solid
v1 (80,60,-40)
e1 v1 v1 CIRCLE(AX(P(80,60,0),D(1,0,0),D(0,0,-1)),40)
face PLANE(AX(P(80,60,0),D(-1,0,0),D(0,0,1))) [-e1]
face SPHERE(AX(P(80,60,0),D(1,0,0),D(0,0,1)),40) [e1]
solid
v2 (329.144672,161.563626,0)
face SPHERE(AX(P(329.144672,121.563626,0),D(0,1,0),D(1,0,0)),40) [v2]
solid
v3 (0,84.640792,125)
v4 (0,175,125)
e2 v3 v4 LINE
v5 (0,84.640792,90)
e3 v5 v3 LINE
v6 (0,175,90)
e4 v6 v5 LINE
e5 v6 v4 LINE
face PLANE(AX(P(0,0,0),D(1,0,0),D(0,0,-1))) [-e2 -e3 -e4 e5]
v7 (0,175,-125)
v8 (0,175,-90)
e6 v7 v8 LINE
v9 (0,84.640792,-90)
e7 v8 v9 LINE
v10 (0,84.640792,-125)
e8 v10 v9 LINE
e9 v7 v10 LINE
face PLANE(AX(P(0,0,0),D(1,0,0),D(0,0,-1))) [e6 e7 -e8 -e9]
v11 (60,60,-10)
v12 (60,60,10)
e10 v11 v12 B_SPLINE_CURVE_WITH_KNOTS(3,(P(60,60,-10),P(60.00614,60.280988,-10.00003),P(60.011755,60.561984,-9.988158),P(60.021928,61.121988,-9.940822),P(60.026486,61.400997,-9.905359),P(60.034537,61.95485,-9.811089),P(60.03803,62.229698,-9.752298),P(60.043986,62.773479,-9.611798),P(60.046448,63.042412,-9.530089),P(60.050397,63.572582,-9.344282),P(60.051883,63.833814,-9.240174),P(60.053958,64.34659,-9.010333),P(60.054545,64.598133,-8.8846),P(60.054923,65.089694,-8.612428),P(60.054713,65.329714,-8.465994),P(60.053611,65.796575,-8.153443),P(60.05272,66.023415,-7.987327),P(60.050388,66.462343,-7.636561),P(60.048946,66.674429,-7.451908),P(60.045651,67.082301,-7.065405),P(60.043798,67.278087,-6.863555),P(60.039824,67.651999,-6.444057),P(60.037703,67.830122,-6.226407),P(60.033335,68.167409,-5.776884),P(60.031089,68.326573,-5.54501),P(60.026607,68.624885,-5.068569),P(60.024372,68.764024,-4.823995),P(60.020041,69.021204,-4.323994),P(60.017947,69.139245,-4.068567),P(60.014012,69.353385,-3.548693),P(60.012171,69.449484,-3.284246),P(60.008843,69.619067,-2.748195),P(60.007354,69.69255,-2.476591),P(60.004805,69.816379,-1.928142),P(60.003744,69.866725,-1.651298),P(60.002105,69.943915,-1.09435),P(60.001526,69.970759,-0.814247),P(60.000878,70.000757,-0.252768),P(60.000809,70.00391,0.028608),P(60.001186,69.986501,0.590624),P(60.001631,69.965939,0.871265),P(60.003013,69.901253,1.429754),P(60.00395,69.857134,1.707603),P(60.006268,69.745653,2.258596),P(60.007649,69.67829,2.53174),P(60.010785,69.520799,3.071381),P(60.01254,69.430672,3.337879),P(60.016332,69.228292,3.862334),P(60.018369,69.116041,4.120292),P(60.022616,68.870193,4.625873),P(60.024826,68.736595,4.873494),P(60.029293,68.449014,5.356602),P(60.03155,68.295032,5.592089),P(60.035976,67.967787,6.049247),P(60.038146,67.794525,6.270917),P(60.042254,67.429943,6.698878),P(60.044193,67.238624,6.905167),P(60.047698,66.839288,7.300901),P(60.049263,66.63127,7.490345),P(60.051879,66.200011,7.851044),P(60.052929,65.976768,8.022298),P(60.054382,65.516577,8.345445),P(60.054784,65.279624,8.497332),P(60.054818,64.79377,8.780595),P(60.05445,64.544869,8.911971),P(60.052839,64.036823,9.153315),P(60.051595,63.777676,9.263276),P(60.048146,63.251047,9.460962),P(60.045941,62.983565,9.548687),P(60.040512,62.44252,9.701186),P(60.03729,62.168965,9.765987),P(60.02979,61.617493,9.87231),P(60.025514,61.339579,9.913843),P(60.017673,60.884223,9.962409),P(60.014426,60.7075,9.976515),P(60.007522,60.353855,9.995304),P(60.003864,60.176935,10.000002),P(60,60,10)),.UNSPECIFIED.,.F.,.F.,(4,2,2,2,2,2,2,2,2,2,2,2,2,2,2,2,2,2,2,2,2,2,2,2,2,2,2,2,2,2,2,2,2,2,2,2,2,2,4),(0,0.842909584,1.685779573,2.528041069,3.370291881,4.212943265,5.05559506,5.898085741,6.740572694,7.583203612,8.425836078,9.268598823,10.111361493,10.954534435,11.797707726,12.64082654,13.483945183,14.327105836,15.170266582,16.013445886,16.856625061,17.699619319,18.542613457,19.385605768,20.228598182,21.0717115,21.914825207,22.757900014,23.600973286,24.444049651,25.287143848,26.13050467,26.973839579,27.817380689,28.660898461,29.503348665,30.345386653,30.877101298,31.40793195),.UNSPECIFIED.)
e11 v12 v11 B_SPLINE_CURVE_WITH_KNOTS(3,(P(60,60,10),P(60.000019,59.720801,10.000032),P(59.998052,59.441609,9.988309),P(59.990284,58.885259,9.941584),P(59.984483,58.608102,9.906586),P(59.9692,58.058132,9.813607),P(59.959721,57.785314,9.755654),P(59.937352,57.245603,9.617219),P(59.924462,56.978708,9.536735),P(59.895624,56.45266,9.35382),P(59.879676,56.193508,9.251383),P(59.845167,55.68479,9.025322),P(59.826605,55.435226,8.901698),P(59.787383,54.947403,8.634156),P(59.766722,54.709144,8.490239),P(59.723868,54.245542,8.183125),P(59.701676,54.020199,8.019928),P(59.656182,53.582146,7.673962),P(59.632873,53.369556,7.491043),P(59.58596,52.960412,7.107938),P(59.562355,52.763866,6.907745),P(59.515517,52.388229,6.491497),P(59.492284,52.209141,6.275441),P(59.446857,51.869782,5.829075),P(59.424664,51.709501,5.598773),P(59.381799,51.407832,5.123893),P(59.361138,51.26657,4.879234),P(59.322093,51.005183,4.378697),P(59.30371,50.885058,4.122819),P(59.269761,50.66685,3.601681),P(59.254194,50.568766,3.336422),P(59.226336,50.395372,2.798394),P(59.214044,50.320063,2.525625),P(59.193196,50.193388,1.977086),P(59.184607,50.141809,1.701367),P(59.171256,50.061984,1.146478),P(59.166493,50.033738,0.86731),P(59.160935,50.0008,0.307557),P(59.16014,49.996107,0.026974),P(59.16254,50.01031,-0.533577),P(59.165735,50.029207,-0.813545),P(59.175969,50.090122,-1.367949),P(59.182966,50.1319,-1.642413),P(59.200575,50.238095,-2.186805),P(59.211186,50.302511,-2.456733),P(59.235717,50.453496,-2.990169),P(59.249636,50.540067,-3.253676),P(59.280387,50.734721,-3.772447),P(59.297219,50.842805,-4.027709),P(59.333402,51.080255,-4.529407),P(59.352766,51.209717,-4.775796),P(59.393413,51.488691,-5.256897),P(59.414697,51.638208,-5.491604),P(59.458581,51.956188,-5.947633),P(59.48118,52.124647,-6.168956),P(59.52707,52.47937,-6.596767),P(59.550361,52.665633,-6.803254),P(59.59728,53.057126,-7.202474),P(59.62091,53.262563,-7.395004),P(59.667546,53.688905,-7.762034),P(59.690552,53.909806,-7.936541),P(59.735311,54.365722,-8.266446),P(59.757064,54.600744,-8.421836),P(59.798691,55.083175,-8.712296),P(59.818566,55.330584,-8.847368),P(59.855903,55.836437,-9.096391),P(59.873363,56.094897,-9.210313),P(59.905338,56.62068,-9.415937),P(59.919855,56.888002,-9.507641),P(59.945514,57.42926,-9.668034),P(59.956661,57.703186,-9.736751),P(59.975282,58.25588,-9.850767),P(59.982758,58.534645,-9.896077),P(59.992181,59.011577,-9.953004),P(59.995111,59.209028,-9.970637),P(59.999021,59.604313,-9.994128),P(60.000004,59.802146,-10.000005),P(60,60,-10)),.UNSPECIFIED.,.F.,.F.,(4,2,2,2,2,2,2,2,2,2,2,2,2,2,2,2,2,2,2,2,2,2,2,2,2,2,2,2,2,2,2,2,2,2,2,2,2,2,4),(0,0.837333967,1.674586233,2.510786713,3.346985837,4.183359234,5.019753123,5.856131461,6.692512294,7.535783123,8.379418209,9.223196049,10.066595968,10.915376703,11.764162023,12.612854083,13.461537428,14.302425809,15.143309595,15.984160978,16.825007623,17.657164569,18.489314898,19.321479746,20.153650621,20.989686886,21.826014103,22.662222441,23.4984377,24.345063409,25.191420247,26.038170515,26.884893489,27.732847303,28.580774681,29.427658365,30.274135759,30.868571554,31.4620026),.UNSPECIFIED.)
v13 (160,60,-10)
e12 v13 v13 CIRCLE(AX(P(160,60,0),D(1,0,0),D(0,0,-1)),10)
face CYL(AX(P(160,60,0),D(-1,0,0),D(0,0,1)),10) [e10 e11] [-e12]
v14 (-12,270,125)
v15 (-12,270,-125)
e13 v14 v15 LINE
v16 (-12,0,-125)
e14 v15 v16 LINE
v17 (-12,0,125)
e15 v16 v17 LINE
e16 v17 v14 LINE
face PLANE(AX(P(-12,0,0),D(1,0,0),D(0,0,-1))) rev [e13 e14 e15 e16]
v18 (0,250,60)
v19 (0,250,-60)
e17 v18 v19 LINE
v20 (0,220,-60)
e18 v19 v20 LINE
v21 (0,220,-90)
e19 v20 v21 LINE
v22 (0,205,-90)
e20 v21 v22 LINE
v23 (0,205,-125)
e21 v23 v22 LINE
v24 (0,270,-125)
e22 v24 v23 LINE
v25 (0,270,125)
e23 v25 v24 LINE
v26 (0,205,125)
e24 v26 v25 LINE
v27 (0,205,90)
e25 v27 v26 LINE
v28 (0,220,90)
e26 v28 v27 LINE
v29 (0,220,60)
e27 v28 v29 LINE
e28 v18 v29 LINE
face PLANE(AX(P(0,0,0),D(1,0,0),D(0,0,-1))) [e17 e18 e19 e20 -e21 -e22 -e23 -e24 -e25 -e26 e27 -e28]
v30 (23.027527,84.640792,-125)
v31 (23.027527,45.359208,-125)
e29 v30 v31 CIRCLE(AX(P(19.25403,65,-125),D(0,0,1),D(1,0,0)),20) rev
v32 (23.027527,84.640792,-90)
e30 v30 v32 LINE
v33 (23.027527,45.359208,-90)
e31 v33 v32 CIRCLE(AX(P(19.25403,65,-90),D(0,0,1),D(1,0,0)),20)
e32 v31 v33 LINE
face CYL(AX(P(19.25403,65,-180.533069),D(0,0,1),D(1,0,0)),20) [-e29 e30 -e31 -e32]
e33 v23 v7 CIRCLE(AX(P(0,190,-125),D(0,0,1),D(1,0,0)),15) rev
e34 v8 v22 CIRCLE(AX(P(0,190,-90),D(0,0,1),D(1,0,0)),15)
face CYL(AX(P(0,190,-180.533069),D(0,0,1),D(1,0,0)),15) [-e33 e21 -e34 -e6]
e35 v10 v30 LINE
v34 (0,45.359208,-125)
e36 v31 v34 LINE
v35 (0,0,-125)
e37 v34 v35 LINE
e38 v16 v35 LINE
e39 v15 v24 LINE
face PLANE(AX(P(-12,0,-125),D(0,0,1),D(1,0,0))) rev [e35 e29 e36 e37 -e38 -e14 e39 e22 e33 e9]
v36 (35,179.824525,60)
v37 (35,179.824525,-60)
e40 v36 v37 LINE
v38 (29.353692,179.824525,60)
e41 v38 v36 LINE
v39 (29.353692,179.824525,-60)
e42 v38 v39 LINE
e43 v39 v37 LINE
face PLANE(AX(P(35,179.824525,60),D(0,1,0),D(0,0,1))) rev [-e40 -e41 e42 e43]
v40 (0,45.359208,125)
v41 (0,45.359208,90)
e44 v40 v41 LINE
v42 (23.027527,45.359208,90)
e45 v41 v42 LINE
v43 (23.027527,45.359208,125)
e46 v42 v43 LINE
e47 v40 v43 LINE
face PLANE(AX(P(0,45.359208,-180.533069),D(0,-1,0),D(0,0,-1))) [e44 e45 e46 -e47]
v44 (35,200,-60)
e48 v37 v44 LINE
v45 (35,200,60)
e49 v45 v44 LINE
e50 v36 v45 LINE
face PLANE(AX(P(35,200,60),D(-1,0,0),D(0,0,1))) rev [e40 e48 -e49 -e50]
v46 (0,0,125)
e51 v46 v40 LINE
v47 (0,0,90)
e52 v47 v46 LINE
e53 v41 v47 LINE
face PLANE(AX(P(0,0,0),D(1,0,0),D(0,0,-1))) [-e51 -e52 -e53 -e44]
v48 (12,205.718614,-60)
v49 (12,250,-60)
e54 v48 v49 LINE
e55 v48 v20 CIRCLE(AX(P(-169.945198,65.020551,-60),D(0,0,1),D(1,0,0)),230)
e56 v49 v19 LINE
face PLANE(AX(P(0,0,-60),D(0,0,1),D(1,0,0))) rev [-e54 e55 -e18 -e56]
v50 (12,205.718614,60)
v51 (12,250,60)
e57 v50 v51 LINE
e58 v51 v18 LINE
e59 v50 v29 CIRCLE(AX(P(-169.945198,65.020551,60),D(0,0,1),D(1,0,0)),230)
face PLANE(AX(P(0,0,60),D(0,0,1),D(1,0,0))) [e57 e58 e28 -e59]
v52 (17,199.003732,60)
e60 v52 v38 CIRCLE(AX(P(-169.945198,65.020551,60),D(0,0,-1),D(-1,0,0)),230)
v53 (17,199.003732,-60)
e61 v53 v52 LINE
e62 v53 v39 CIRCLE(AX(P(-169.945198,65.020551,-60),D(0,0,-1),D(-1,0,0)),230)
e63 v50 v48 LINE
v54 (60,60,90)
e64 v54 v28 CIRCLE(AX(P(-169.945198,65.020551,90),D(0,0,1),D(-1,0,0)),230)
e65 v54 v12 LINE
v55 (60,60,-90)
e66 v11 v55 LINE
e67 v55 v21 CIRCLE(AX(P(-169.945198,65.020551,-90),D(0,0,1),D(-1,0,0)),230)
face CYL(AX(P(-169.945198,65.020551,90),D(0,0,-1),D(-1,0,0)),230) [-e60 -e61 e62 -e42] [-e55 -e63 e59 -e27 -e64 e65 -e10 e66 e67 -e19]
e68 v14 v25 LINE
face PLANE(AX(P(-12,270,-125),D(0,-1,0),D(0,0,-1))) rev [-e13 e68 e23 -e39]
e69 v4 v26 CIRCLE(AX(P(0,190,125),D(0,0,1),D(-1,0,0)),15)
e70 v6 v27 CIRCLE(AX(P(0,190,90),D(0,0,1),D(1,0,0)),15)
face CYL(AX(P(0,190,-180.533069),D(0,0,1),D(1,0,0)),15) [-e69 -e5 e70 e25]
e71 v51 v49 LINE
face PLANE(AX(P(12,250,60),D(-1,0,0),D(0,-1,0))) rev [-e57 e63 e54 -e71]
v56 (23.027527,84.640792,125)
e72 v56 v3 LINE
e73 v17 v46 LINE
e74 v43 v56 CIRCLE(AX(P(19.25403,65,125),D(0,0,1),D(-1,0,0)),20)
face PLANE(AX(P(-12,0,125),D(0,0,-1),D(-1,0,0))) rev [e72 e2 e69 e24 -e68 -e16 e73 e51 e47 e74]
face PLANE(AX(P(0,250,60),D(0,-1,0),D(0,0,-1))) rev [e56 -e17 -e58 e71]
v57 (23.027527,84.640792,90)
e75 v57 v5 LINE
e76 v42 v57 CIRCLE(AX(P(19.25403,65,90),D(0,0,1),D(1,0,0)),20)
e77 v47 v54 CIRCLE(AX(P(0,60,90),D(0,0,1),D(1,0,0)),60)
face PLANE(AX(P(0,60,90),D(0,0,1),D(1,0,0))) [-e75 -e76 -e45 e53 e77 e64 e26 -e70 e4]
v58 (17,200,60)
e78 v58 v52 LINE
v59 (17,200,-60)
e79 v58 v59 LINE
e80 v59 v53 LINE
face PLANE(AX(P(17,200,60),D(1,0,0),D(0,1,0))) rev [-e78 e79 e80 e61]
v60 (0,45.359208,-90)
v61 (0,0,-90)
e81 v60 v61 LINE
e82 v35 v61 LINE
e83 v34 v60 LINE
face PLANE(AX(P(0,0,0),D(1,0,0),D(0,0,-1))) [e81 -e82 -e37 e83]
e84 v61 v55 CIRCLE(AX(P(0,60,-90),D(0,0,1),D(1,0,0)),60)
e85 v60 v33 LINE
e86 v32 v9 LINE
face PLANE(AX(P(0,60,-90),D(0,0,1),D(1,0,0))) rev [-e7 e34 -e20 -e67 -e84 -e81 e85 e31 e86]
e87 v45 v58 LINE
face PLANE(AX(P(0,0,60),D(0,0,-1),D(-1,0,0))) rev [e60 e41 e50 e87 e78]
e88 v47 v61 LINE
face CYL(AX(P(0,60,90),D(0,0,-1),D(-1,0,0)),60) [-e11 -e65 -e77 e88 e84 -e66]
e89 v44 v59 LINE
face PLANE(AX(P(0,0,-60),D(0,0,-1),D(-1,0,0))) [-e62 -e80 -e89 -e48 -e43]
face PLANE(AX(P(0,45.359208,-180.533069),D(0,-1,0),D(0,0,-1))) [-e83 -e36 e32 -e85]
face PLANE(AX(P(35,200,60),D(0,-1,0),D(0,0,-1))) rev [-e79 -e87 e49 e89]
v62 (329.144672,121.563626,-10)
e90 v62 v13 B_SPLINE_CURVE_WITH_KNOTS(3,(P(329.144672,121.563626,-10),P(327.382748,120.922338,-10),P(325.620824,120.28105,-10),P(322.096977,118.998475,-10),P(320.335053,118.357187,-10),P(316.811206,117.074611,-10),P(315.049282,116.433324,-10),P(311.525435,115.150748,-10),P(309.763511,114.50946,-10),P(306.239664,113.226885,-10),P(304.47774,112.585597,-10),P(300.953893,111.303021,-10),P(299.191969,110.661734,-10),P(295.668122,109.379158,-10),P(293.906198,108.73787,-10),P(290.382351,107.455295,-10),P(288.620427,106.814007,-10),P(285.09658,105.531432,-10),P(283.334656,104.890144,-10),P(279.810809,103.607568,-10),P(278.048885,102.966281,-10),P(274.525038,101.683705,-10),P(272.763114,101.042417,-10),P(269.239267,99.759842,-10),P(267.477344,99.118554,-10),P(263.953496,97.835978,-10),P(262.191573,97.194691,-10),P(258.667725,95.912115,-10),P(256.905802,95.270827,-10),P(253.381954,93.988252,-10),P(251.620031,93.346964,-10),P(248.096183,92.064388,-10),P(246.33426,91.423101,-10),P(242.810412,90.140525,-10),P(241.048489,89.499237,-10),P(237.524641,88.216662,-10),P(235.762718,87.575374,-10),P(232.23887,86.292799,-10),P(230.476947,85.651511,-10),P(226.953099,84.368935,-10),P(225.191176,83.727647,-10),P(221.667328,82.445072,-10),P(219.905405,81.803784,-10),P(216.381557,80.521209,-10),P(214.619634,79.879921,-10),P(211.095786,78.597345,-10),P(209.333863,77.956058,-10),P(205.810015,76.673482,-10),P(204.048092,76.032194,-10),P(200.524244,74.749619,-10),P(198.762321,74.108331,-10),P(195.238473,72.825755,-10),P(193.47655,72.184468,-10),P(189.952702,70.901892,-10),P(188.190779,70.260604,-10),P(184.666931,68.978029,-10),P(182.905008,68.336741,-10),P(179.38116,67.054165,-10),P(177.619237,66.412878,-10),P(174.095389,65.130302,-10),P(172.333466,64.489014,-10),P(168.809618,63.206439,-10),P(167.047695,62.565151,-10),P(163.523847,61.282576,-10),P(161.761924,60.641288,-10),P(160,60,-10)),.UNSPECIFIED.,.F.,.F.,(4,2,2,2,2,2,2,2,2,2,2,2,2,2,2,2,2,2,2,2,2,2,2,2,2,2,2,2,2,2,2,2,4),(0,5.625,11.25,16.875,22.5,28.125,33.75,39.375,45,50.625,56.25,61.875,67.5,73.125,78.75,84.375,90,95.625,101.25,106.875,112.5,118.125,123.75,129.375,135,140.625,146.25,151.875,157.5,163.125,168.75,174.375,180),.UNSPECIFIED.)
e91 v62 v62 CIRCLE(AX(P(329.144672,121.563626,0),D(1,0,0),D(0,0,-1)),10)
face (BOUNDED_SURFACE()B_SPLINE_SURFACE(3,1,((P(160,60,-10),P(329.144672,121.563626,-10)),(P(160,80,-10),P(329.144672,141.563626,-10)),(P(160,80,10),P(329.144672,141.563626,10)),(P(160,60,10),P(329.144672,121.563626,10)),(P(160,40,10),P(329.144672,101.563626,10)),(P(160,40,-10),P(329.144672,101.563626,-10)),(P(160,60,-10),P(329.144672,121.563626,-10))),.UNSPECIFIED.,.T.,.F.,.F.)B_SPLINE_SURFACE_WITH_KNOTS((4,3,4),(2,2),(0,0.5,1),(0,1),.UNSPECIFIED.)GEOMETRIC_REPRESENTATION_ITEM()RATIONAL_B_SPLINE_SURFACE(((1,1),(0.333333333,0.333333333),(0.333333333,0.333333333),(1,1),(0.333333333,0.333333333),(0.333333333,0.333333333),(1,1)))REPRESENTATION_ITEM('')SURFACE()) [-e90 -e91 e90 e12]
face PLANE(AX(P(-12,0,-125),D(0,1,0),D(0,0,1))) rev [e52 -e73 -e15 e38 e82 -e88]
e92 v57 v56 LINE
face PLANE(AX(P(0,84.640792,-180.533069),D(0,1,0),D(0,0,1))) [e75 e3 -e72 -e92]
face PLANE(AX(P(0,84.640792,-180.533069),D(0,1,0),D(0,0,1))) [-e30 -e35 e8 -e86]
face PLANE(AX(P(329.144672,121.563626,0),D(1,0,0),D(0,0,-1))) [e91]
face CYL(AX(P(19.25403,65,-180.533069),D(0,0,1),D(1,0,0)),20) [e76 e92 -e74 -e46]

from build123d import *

# Parameters (mm, degrees)
BOSS_EXTRUDE1_DEPTH = 90
SKETCH2_W           = 250
SKETCH2_H           = 270
BOSS_EXTRUDE2_DEPTH = 12
SKETCH3_W           = 12
SKETCH3_H           = 71.994382314
SKETCH3_W_2         = 18
SKETCH3_H_2         = 20.175474964
BOSS_EXTRUDE3_DEPTH = 60
BOSS_EXTRUDE4_REACH = 374.836
SKETCH5_R           = 10
BOSS_EXTRUDE5_DEPTH = 160


with BuildPart() as part:
    # Sketch1 → Boss-Extrude1 (new, symmetric)
    with BuildSketch(Plane.XY):
        with BuildLine():
            Line((0, 0), (0, 220))
            ThreePointArc((0, 220), (45.41051287, 145.778942326), (60, 60))
            ThreePointArc((60, 60), (42.426406871, 17.573593129), (0, 0))
        make_face()
    extrude(amount=BOSS_EXTRUDE1_DEPTH, both=True)

    # Sketch2 → Boss-Extrude2 (add)
    with BuildSketch(Plane.ZY):
        with Locations((0, 135)):
            Rectangle(SKETCH2_W, SKETCH2_H)
    extrude(amount=BOSS_EXTRUDE2_DEPTH)

    # Sketch3 → Boss-Extrude3 (add, symmetric)
    with BuildSketch(Plane.XY):
        with Locations((6, 214.002808843)):
            Rectangle(SKETCH3_W, SKETCH3_H)
        with Locations((26, 189.912262518)):
            Rectangle(SKETCH3_W_2, SKETCH3_H_2)
    extrude(amount=BOSS_EXTRUDE3_DEPTH, both=True)

    # Boss-Extrude4: up to this face of the body (flat: up to its plane)
    boss_extrude4_end = Plane(part.part.faces().sort_by_distance((-6, 135, -125))[0])
    # Sketch4 → Boss-Extrude4 (add, up to the picked face)
    with BuildSketch(Plane.XY.offset(125), mode=Mode.PRIVATE) as boss_extrude4_sk1:
        with BuildLine():
            Line((0, 84.640792399), (23.027526502, 84.640792399))
            ThreePointArc((23.027526502, 84.640792399), (39.254030252, 65), (23.027526502, 45.359207601))
            Line((23.027526502, 45.359207601), (0, 45.359207601))
            Line((0, 45.359207601), (0, 84.640792399))
        make_face()
    boss_extrude4_tool1 = split(extrude(boss_extrude4_sk1.sketch, amount=-BOSS_EXTRUDE4_REACH, mode=Mode.PRIVATE), bisect_by=boss_extrude4_end, keep=Keep.BOTH, mode=Mode.PRIVATE)
    # Sketch4 → Boss-Extrude4 (add, up to the picked face)
    with BuildSketch(Plane.XY.offset(125), mode=Mode.PRIVATE) as boss_extrude4_sk2:
        with BuildLine():
            Line((0, 205), (0, 175))
            ThreePointArc((0, 175), (15, 190), (0, 205))
        make_face()
    boss_extrude4_tool2 = split(extrude(boss_extrude4_sk2.sketch, amount=-BOSS_EXTRUDE4_REACH, mode=Mode.PRIVATE), bisect_by=boss_extrude4_end, keep=Keep.BOTH, mode=Mode.PRIVATE)
    add(boss_extrude4_tool1.solids().sort_by(Axis((17.843581, 65, 125), (0, 0, -1)))[0])
    add(boss_extrude4_tool2.solids().sort_by(Axis((6.366198, 190, 125), (0, 0, -1)))[0])

    # Sketch5 → Boss-Extrude5 (add)
    with BuildSketch(Plane(origin=(0, 0, 0), x_dir=(0, 0, -1), z_dir=(1, 0, 0))):
        with Locations((0, 60)):
            Circle(SKETCH5_R)
    extrude(amount=BOSS_EXTRUDE5_DEPTH)

    # Sweep1: read off the stored shape, not the designer's step
    # Sweep1: loft between two sections, ruled curve by curve
    sweep1_from = [
        Edge.make_bspline([(160, 60, -10), (160, 80, -10), (160, 80, 10), (160, 60, 10), (160, 40, 10), (160, 40, -10), (160, 60, -10)], [0, 0, 0, 0, 0.5, 0.5, 0.5, 1, 1, 1, 1], 3, [1, 0.333333333, 0.333333333, 1, 0.333333333, 0.333333333, 1]),
    ]
    sweep1_to = [
        Edge.make_bspline([(329.144671741, 121.563625799, -10), (329.144671741, 141.563625799, -10), (329.144671741, 141.563625799, 10), (329.144671741, 121.563625799, 10), (329.144671741, 101.563625799, 10), (329.144671741, 101.563625799, -10), (329.144671741, 121.563625799, -10)], [0, 0, 0, 0, 0.5, 0.5, 0.5, 1, 1, 1, 1], 3, [1, 0.333333333, 0.333333333, 1, 0.333333333, 0.333333333, 1]),
    ]
    sweep1 = Solid(Shell([*[Face.make_surface_from_curves(sweep1_from[k], sweep1_to[k]) for k in range(1)], Face(Wire(sweep1_from)), Face(Wire(sweep1_to))]))
    add(sweep1)


with BuildPart() as body_2:
    # Sketch6 → Revolve1 (revolve)
    with BuildSketch(Plane(origin=(0, 60, 0), x_dir=(-1, 0, 0), z_dir=(0, -1, 0))):
        with BuildLine():
            Line((-80, 0), (-80, -40))
            ThreePointArc((-80, -40), (-108.284271247, -28.284271247), (-120, 0))
            Line((-120, 0), (-80, 0))
        make_face()
    revolve(axis=Axis((120, 60, 0), (-1, 0, 0)))


with BuildPart() as body_3:
    # Sketch11 → Revolve2 (revolve)
    with BuildSketch(Plane.XY):
        with BuildLine():
            Line((329.144671741, 161.563625799), (329.144671741, 81.563625799))
            ThreePointArc((329.144671741, 81.563625799), (369.144671741, 121.563625799), (329.144671741, 161.563625799))
        make_face()
    revolve(axis=Axis((329.144671741, 161.563625799, 0), (0, -1, 0)))


solid = Compound([part.part, body_2.part, body_3.part])
